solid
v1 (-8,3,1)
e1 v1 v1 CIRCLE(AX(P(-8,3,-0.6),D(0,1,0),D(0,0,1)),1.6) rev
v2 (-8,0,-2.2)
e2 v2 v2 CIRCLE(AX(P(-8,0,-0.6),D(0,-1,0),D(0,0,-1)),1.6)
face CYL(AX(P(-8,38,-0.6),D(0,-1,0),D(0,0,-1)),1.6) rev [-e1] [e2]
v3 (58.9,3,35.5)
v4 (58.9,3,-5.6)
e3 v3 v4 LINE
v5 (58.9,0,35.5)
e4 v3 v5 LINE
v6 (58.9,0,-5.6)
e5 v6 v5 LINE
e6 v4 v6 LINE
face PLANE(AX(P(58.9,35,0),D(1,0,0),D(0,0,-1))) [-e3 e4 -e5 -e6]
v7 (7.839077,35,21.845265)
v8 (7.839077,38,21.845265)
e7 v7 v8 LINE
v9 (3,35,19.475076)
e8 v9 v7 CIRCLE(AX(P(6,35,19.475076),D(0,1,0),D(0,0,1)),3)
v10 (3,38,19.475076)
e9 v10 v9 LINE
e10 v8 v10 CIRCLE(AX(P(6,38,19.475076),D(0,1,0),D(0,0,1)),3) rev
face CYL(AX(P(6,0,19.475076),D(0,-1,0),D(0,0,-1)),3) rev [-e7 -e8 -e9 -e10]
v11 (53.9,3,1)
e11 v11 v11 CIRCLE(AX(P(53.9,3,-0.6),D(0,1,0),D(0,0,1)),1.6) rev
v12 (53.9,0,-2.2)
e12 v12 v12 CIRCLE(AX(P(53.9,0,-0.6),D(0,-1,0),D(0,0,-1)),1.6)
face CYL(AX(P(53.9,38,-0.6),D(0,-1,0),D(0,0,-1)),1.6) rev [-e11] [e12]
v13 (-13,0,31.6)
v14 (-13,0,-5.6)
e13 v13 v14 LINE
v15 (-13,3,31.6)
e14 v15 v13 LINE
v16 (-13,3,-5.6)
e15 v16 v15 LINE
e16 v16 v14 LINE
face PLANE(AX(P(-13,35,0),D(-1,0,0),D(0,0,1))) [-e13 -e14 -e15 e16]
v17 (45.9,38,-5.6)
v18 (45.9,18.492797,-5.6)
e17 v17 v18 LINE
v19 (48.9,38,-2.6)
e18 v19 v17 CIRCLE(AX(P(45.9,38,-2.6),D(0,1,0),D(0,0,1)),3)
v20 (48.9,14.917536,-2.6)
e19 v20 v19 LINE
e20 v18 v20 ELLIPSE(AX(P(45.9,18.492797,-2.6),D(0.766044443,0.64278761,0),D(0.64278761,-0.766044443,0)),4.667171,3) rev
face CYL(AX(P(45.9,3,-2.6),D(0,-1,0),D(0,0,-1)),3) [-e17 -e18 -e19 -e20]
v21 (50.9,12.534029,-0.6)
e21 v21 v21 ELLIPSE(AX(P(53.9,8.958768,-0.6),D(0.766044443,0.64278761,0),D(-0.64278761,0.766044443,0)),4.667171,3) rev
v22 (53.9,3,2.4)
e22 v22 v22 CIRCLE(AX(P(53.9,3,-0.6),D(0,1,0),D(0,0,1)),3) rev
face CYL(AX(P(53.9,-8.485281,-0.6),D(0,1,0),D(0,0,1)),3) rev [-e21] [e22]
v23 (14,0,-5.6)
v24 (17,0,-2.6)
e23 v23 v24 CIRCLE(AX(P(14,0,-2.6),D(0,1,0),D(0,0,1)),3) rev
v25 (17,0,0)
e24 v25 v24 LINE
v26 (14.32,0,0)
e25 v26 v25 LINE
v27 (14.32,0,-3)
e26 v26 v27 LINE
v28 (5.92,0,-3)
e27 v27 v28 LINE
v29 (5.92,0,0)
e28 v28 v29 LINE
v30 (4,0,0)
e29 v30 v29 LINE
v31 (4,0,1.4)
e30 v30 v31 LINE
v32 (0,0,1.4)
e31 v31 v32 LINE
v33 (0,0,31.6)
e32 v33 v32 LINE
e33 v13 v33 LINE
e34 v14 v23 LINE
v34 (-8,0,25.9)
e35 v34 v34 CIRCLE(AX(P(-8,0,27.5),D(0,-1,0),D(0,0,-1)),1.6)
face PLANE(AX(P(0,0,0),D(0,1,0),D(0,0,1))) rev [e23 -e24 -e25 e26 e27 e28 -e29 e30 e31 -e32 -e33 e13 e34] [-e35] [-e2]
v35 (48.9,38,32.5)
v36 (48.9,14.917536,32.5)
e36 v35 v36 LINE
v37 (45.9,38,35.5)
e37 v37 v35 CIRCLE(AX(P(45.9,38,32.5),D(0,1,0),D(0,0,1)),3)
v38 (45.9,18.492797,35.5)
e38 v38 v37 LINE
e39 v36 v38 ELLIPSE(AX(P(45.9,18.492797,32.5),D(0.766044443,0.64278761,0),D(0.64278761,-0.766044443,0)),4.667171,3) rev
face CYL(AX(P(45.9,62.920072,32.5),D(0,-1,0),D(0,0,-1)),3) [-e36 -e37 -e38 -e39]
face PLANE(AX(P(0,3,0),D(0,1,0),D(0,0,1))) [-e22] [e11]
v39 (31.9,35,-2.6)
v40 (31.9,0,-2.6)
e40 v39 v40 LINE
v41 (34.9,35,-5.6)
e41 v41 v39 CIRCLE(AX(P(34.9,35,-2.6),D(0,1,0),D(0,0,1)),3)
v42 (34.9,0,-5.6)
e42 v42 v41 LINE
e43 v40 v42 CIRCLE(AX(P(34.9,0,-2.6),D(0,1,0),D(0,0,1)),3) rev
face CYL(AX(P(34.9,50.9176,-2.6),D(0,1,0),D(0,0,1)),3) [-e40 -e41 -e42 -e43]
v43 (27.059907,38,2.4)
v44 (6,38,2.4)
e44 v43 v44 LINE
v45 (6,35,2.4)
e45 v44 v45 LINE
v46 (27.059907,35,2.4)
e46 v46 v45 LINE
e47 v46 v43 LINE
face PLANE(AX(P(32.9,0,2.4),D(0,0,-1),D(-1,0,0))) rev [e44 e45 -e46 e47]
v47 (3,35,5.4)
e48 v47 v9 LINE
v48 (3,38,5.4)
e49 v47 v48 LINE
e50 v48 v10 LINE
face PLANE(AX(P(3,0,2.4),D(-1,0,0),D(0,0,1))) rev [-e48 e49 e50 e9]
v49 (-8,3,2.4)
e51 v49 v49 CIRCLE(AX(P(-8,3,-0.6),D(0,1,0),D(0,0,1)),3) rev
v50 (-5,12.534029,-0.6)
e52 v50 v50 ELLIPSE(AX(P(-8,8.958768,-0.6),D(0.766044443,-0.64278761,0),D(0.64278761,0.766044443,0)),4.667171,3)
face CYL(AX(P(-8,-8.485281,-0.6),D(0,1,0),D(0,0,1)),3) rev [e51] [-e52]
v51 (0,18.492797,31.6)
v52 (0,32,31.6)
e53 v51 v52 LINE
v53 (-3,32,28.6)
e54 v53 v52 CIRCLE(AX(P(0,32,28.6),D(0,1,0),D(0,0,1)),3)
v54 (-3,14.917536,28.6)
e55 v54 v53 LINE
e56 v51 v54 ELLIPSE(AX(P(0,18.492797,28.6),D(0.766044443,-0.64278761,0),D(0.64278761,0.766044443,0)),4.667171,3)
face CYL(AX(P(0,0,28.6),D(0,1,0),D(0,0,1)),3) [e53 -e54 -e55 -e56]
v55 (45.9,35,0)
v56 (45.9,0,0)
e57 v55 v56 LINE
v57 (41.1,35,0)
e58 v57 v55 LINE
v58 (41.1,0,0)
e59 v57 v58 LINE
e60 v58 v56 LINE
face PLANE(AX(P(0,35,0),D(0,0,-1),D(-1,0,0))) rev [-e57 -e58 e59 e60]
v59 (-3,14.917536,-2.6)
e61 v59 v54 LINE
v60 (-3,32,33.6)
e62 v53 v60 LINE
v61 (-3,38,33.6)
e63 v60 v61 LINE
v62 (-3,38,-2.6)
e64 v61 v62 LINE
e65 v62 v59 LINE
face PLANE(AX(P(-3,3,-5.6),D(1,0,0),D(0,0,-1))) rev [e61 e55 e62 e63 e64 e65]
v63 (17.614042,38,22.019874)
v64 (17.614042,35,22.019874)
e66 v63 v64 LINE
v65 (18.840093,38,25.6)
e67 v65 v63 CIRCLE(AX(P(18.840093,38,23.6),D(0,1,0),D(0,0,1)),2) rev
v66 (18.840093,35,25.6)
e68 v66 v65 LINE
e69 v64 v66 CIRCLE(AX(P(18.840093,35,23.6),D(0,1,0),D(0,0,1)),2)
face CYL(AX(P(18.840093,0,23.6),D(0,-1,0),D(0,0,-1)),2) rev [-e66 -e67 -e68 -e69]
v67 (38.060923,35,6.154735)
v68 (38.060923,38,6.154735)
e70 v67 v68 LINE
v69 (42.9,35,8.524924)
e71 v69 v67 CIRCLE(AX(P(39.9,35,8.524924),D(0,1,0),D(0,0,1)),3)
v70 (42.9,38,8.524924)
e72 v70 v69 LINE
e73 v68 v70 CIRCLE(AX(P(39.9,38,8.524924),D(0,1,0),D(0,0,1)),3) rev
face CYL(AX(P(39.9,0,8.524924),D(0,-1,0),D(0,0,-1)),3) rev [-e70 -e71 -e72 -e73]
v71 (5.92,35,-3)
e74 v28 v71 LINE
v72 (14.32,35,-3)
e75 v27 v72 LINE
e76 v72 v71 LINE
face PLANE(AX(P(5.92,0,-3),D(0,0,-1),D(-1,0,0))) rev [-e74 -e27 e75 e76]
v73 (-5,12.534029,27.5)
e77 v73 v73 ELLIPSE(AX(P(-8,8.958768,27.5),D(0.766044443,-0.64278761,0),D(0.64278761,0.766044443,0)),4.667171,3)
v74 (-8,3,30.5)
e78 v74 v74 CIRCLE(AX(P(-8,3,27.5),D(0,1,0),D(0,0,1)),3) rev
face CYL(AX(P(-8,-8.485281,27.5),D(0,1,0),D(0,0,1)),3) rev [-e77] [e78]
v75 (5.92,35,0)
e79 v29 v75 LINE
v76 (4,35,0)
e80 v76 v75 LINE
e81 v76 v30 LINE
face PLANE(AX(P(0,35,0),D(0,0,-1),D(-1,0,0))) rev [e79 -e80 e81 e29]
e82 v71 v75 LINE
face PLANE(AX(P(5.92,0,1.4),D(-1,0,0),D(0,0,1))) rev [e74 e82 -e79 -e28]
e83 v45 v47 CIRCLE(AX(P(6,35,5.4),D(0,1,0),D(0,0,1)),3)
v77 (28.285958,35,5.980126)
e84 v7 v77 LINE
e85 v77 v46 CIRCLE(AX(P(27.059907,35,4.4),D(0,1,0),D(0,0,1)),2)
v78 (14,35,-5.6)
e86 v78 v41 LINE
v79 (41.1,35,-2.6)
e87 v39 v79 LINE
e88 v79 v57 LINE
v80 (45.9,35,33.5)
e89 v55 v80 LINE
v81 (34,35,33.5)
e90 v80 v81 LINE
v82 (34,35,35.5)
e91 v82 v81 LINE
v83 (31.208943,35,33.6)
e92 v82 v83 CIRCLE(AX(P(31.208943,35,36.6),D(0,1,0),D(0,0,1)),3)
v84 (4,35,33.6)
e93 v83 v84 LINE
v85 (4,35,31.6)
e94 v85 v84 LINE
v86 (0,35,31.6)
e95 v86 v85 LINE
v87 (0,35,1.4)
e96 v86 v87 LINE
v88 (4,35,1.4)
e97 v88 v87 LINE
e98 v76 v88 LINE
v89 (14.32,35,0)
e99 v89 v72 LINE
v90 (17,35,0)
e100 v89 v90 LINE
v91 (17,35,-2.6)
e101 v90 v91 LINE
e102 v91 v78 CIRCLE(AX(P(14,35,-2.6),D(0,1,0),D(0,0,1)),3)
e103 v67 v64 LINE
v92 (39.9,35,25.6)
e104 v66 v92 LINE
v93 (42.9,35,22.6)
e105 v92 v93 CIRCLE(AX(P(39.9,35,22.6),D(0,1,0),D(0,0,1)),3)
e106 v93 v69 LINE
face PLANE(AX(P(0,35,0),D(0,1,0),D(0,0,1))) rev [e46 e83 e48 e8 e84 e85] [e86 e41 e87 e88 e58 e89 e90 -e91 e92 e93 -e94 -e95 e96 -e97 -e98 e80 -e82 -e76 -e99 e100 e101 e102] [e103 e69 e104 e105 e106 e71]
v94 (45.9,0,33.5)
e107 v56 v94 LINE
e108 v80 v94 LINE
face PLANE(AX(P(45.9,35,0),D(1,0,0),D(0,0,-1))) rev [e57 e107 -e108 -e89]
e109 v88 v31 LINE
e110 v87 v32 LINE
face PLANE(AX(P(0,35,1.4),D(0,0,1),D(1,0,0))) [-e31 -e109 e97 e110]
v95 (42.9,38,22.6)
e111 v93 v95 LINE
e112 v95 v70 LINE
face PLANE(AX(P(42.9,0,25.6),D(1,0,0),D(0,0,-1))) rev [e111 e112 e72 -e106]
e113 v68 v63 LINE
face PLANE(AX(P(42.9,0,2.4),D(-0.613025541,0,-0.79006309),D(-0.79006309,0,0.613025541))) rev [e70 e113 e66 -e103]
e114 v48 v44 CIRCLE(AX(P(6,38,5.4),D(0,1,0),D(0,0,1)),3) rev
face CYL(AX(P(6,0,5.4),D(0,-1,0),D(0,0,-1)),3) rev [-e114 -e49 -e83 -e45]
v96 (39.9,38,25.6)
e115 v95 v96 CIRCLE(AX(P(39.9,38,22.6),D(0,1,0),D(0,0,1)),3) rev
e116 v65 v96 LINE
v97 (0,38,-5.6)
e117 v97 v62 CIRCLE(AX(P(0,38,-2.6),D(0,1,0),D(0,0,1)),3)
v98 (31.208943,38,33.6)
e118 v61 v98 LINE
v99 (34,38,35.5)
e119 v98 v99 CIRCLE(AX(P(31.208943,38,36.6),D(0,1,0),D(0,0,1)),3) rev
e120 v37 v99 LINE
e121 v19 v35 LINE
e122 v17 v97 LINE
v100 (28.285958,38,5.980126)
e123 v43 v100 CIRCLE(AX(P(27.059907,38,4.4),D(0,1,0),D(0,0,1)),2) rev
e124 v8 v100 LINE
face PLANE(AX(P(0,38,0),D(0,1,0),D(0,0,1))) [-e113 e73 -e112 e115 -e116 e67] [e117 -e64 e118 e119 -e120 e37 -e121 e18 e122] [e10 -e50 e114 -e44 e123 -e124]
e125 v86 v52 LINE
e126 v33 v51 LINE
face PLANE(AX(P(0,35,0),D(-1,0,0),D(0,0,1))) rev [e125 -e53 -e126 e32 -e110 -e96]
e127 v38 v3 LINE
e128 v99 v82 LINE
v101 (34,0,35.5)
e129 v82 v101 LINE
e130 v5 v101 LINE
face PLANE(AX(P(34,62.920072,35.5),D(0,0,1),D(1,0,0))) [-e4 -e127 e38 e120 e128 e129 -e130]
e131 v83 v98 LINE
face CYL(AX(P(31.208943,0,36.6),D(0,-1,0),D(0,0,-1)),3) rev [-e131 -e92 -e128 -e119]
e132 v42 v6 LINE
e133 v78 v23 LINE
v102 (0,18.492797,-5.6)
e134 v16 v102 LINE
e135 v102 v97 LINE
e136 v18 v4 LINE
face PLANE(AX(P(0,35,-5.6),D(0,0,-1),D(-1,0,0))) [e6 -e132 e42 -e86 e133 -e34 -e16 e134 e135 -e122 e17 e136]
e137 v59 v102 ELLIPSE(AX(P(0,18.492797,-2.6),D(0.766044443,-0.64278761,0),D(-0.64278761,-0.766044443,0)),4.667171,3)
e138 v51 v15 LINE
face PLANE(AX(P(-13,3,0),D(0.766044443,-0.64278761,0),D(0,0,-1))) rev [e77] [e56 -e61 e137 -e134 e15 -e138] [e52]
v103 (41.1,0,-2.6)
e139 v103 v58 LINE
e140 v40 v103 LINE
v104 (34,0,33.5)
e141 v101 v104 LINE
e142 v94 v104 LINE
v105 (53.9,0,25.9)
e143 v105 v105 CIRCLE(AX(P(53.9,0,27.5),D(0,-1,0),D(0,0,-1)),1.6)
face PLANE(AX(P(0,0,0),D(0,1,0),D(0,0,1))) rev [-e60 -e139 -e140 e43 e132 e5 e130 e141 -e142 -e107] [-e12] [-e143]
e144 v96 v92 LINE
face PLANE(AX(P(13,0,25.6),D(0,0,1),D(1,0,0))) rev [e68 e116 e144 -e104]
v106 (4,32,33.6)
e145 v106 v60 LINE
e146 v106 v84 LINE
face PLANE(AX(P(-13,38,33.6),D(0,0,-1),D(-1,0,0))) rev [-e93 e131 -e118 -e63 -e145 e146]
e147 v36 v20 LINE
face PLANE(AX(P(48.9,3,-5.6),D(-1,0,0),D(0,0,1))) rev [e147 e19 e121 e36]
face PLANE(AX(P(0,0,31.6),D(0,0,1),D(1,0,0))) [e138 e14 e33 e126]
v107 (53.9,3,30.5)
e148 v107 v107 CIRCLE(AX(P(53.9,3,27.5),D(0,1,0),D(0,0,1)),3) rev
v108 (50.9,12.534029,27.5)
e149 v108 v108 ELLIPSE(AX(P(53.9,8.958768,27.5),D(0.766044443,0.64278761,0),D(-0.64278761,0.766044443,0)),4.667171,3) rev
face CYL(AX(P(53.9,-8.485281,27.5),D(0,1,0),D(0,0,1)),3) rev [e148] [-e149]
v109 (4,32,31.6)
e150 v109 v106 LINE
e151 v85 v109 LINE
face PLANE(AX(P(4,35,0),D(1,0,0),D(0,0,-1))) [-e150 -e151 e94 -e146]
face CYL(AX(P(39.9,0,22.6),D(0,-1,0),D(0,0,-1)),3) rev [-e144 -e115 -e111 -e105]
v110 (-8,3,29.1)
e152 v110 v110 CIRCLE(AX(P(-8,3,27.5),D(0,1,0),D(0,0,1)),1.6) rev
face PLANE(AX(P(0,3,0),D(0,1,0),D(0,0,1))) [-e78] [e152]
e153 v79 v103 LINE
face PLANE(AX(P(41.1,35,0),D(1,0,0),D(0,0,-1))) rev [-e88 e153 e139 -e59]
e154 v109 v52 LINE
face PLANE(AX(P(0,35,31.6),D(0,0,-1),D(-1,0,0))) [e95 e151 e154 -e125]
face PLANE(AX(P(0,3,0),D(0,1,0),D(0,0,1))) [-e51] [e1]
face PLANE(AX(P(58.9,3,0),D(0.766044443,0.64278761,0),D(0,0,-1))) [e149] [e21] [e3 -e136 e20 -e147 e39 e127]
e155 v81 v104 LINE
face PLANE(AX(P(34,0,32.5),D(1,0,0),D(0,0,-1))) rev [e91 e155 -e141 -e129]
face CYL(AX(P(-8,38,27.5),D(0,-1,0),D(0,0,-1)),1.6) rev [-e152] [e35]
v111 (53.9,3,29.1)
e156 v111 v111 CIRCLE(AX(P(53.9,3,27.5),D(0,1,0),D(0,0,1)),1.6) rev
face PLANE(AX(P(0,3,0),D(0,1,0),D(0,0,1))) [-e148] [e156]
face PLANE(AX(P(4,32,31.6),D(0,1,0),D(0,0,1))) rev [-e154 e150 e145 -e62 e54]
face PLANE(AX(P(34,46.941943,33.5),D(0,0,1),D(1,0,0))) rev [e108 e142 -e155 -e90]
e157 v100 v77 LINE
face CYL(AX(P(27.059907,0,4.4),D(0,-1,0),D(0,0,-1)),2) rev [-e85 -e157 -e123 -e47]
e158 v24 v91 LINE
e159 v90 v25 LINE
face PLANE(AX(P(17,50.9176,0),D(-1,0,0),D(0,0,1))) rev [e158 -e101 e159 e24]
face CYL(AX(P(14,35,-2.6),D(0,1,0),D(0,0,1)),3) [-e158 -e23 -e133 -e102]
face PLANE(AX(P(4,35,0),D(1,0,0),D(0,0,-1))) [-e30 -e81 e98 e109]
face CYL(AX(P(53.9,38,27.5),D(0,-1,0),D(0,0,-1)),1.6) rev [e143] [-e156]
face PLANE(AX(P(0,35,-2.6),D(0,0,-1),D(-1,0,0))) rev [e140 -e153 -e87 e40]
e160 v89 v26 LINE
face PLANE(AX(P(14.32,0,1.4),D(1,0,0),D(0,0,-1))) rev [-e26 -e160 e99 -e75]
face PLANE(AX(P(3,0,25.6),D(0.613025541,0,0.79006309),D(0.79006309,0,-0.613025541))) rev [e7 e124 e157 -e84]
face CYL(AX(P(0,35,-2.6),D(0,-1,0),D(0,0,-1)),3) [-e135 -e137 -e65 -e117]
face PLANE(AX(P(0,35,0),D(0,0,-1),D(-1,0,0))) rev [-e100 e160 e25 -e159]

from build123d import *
from OCP.BRepFilletAPI import BRepFilletAPI_MakeFillet

# Parameters (mm, degrees)
SKETCH_1_W           = 71.9
SKETCH_1_H           = 40.1
SKETCH_1_W_2         = 4
SKETCH_1_H_2         = 1.4
SKETCH_1_H_3         = 0.9
EXTRUDE_1_DEPTH      = 35
SKETCH_4_W           = 8.4
SKETCH_4_H           = 4.4
SKETCH_4_W_2         = 30
SKETCH_4_H_2         = 2
CUT_EXTRUDE_2_DEPTH  = 77.710233998
SKETCH_5_W           = 71.9
SKETCH_5_H           = 40.1
EXTRUDE_2_DEPTH      = 3
SKETCH_6_W           = 47
SKETCH_6_H           = 0.9
CUT_EXTRUDE_3_DEPTH  = 79.124643999
SKETCH_7_R           = 1.6
CUT_EXTRUDE_4_DEPTH  = 79.124643999
SKETCH_10_W          = 10
SKETCH_10_H          = 39.2
SKETCH_10_H_2        = 40.1
CUT_EXTRUDE_6_DEPTH  = 35
CHAMFER_1_SIZE       = 10
CHAMFER_1_SIZE_2     = 11.917535926
SKETCH_8_R           = 3
CUT_EXTRUDE_5_DEPTH  = 35
SKETCH_11_W          = 17
SKETCH_11_H          = 32
CUT_EXTRUDE_7_DEPTH  = 2
CUT_EXTRUDE_8_DEPTH  = 79.124643999
FILLET_2_R1          = 2
FILLET_2_R2          = 3
SKETCH_13_W          = 24.9
SKETCH_13_H          = 1
EXTRUDE_3_DEPTH      = 38
SKETCH_14_W          = 11.9
SKETCH_14_H          = 1
CUT_EXTRUDE_9_DEPTH  = 35
CUT_EXTRUDE_10_REACH = 80.571
SKETCH_15_W          = 10
SKETCH_15_H          = 1
FILLET_3_R           = 3
FILLET_4_R           = 3
SKETCH_16_W          = 14.9
SKETCH_16_H          = 5.6
CUT_EXTRUDE_11_DEPTH = 35
FILLET_5_R           = 3


# Some blends are built 0.0001 mm under size
with BuildPart() as part:
    # 草图1 → 凸台-拉伸1 (new body)
    # profile 1 of 3: a face of its own
    with BuildSketch(Plane(origin=(0, 0, 0), x_dir=(1, 0, 0), z_dir=(0, 1, 0))):
        with Locations((22.95, -14.45)):
            Rectangle(SKETCH_1_W, SKETCH_1_H)
        Polygon((45.9, -32.5), (0, -32.5), (0, 0), (26.7, 0), (26.7, 2.6), (41.1, 2.6), (41.1, 0), (45.9, 0), align=None, mode=Mode.SUBTRACT)
    # profile 2 of 3: a face of its own
    with BuildSketch(Plane(origin=(0, 0, 0), x_dir=(1, 0, 0), z_dir=(0, 1, 0))):
        with Locations((2, -0.7)):
            Rectangle(SKETCH_1_W_2, SKETCH_1_H_2)
    # profile 3 of 3: a face of its own
    with BuildSketch(Plane(origin=(0, 0, 0), x_dir=(1, 0, 0), z_dir=(0, 1, 0))):
        with Locations((2, -32.05)):
            Rectangle(SKETCH_1_W_2, SKETCH_1_H_3)
    extrude(amount=EXTRUDE_1_DEPTH)

    # 草图4 → 切除-拉伸2 (cut, through all)
    with BuildSketch(Plane(origin=(0, 35, 0), x_dir=(1, 0, 0), z_dir=(0, 1, 0))):
        with Locations((10.12, 0.8)):
            Rectangle(SKETCH_4_W, SKETCH_4_H)
        with Locations((19, -33.5)):
            Rectangle(SKETCH_4_W_2, SKETCH_4_H_2)
    extrude(amount=-CUT_EXTRUDE_2_DEPTH, mode=Mode.SUBTRACT)

    # 草图5 → 凸台-拉伸2 (add)
    with BuildSketch(Plane(origin=(0, 35, 0), x_dir=(1, 0, 0), z_dir=(0, 1, 0))):
        with Locations((22.95, -14.45)):
            Rectangle(SKETCH_5_W, SKETCH_5_H)
    extrude(amount=EXTRUDE_2_DEPTH)

    # 草图6 → 切除-拉伸3 (cut, through all)
    with BuildSketch(Plane.XZ):
        with Locations((10.5, 34.05)):
            Rectangle(SKETCH_6_W, SKETCH_6_H)
    extrude(amount=-CUT_EXTRUDE_3_DEPTH, mode=Mode.SUBTRACT)

    # 草图7 → 切除-拉伸4 (cut, through all)
    with BuildSketch(Plane.XZ):
        with Locations(Location((-8, 27.5, 0), (0, 0, 270))):
            Circle(SKETCH_7_R)
        with Locations(Location((53.9, 27.5, 0), (0, 0, 270))):
            Circle(SKETCH_7_R)
        with Locations(Location((-8, -0.6, 0), (0, 0, 270))):
            Circle(SKETCH_7_R)
        with Locations(Location((53.9, -0.6, 0), (0, 0, 270))):
            Circle(SKETCH_7_R)
    extrude(amount=-CUT_EXTRUDE_4_DEPTH, mode=Mode.SUBTRACT)

    # 草图10 → 切除-拉伸6 (cut)
    with BuildSketch(Plane(origin=(0, 38, 0), x_dir=(1, 0, 0), z_dir=(0, 1, 0))):
        with Locations((-8, -14)):
            Rectangle(SKETCH_10_W, SKETCH_10_H)
        with Locations((53.9, -14.45)):
            Rectangle(SKETCH_10_W, SKETCH_10_H_2)
    extrude(amount=-CUT_EXTRUDE_6_DEPTH, mode=Mode.SUBTRACT)

    # 倒角1
    # the kernel refuses this chamfer: 11.917535926, 10 mm, written as the material it adds along each edge
    with BuildSketch(Plane(origin=(48.9, 3, -5.6), x_dir=(0.9993728857116146, -0.03540953691366307, 0), z_dir=(0, 0, 1))) as chamfer_1_piece_1_section:
        Polygon((CHAMFER_1_SIZE * 0.999372885712, CHAMFER_1_SIZE * 0.0354095369137), (-CHAMFER_1_SIZE_2 * 0.0354095369135, CHAMFER_1_SIZE_2 * 0.999372885707), (0, 0), align=None)
    chamfer_1_piece_1 = extrude(amount=40.1, mode=Mode.PRIVATE)
    chamfer_1_piece_1 = split(chamfer_1_piece_1, bisect_by=Plane(origin=(58.9, 6.996958781, 14.489120948), z_dir=(-1, 0, 0)), keep=Keep.TOP, mode=Mode.PRIVATE)
    chamfer_1_piece_1 = chamfer_1_piece_1 - Plane(origin=(53.9, 6.996958781, 27.5), x_dir=(0, 0, -1), z_dir=(0, -1, 0)) * Cylinder(1.6, 128, mode=Mode.PRIVATE)
    chamfer_1_piece_1 = chamfer_1_piece_1 - Plane(origin=(53.9, 6.996958781, -0.6), x_dir=(0, 0, -1), z_dir=(0, -1, 0)) * Cylinder(1.6, 128, mode=Mode.PRIVATE)
    add(chamfer_1_piece_1)
    with BuildSketch(Plane(origin=(-3, 3, -5.6), x_dir=(-0.9993728857116146, -0.03540953691366305, 0), z_dir=(0, 0, 1))) as chamfer_1_piece_2_section:
        Polygon((CHAMFER_1_SIZE * 0.999372885712, -CHAMFER_1_SIZE * 0.0354095369137), (-CHAMFER_1_SIZE_2 * 0.0354095369135, -CHAMFER_1_SIZE_2 * 0.999372885707), (0, 0), align=None)
    chamfer_1_piece_2 = extrude(amount=39.2, mode=Mode.PRIVATE)
    chamfer_1_piece_2 = split(chamfer_1_piece_2, bisect_by=Plane(origin=(-13, 6.997914765, 14.022030522), z_dir=(1, 0, 0)), keep=Keep.TOP, mode=Mode.PRIVATE)
    chamfer_1_piece_2 = chamfer_1_piece_2 - Plane(origin=(-8, 6.997914765, 27.5), x_dir=(0, 0, -1), z_dir=(0, -1, 0)) * Cylinder(1.6, 127, mode=Mode.PRIVATE)
    chamfer_1_piece_2 = chamfer_1_piece_2 - Plane(origin=(-8, 6.997914765, -0.6), x_dir=(0, 0, -1), z_dir=(0, -1, 0)) * Cylinder(1.6, 127, mode=Mode.PRIVATE)
    add(chamfer_1_piece_2)

    # 草图8 → 切除-拉伸5 (cut)
    with BuildSketch(Plane(origin=(0, 38, 0), x_dir=(1, 0, 0), z_dir=(0, 1, 0))):
        with Locations(Location((-8, 0.6, 0), (0, 0, 270))):
            Circle(SKETCH_8_R)
        with Locations(Location((53.9, 0.6, 0), (0, 0, 270))):
            Circle(SKETCH_8_R)
        with Locations(Location((53.9, -27.5, 0), (0, 0, 270))):
            Circle(SKETCH_8_R)
        with Locations(Location((-8, -27.5, 0), (0, 0, 270))):
            Circle(SKETCH_8_R)
    extrude(amount=-CUT_EXTRUDE_5_DEPTH, mode=Mode.SUBTRACT)

    # 草图11 → 切除-拉伸7 (cut)
    with BuildSketch(Plane.XY.offset(33.6)):
        with Locations((-4.5, 16)):
            Rectangle(SKETCH_11_W, SKETCH_11_H)
    extrude(amount=-CUT_EXTRUDE_7_DEPTH, mode=Mode.SUBTRACT)

    # 草图12 → 切除-拉伸8 (cut, through all)
    with BuildSketch(Plane(origin=(0, 38, 0), x_dir=(1, 0, 0), z_dir=(0, 1, 0))):
        Polygon((3, -2.4), (3, -25.6), (32.9, -2.4), align=None)
        Polygon((42.9, -2.4), (13, -25.6), (42.9, -25.6), align=None)
    extrude(amount=-CUT_EXTRUDE_8_DEPTH, mode=Mode.SUBTRACT)

    # 圆角2: one fillet with a radius per group of edges: ONE call of the kernel's fillet builder (fillet() takes one radius for all edges)
    fillet_2_edges_1 = [part.edges().sort_by_distance(p)[0] for p in [
        (13, 36.5, 25.6),
        (32.9, 36.5, 2.4),
    ]]
    fillet_2_edges_2 = [part.edges().sort_by_distance(p)[0] for p in [
        (3, 36.5, 25.6),
        (42.9, 36.5, 25.6),
        (42.9, 36.5, 2.4),
        (3, 36.5, 2.4),
    ]]
    fillet_2 = BRepFilletAPI_MakeFillet(part.part.solid().wrapped)
    for e in fillet_2_edges_1:
        fillet_2.Add(FILLET_2_R1, e.wrapped)
    for e in fillet_2_edges_2:
        fillet_2.Add(FILLET_2_R2, e.wrapped)
    add(Compound.cast(fillet_2.Shape()), mode=Mode.REPLACE)

    # 草图13 → 凸台-拉伸3 (add)
    with BuildSketch(Plane.XZ):
        with Locations((46.45, 35)):
            Rectangle(SKETCH_13_W, SKETCH_13_H)
    extrude(amount=-EXTRUDE_3_DEPTH)

    # 草图14 → 切除-拉伸9 (cut)
    with BuildSketch(Plane.XZ):
        with Locations((39.95, 33)):
            Rectangle(SKETCH_14_W, SKETCH_14_H)
    extrude(amount=-CUT_EXTRUDE_9_DEPTH, mode=Mode.SUBTRACT)

    # 切除-拉伸10: up to this face of the body (flat: up to its plane)
    cut_extrude_10_end = Plane(part.part.faces().sort_by_distance((53.9, 8.958767963, 14.614170269))[0])
    # 草图15 → 切除-拉伸10 (cut, up to the picked face)
    with BuildSketch(Plane(origin=(0, 38, 0), x_dir=(1, 0, 0), z_dir=(0, 1, 0)), mode=Mode.PRIVATE) as cut_extrude_10_sk1:
        with Locations((53.9, -35)):
            Rectangle(SKETCH_15_W, SKETCH_15_H)
    cut_extrude_10_tool1 = split(extrude(cut_extrude_10_sk1.sketch, amount=-CUT_EXTRUDE_10_REACH, mode=Mode.PRIVATE), bisect_by=cut_extrude_10_end, keep=Keep.BOTH, mode=Mode.PRIVATE)
    add(cut_extrude_10_tool1.solids().sort_by(Axis((53.9, 38, 35), (0, -1, 0)))[0], mode=Mode.SUBTRACT)

    # 圆角3
    fillet_3_edges = [part.edges().sort_by_distance(p)[0] for p in [
        (-3, 26.458767963, -5.6),
        (48.9, 26.458767963, -5.6),
        (48.9, 26.458767963, 35.5),
        (-3, 23.458767963, 31.6),
    ]]
    fillet(fillet_3_edges, radius=FILLET_3_R - 0.0001)  # a hair under: the kernel refuses the full size

    # 圆角4
    # the kernel refuses this fillet: 3 mm, written as the material it adds along each edge
    with BuildSketch(Plane(origin=(34, 35, 33.6), x_dir=(0, 0, 1), z_dir=(0, 1, 0))) as fillet_4_piece_1:
        with BuildLine():
            CenterArc((3, -2.791057147), FILLET_4_R, 111.510188267, 68.489811733)
            Line((0, -2.791057147), (-0.06, -2.791057147))
            Line((-0.06, -2.791057147), (-0.06, 0))
            Line((-0.06, 0), (0, 0.06))
            ThreePointArc((0, 0.06), (0.95, 0.06), (1.878, 0.055821143))
            Line((1.878, 0.055821143), (1.9, 0))
        make_face()
    extrude(amount=3)

    # 草图16 → 切除-拉伸11 (cut)
    with BuildSketch(Plane.XZ):
        with Locations((24.45, -2.8)):
            Rectangle(SKETCH_16_W, SKETCH_16_H)
    extrude(amount=-CUT_EXTRUDE_11_DEPTH, mode=Mode.SUBTRACT)

    # 圆角5
    fillet_5_edges = [part.edges().sort_by_distance(p)[0] for p in [
        (31.9, 17.5, -5.6),
        (17, 17.5, -5.6),
    ]]
    fillet(fillet_5_edges, radius=FILLET_5_R - 0.0001)  # a hair under: the kernel refuses the full size


solid = part.part
